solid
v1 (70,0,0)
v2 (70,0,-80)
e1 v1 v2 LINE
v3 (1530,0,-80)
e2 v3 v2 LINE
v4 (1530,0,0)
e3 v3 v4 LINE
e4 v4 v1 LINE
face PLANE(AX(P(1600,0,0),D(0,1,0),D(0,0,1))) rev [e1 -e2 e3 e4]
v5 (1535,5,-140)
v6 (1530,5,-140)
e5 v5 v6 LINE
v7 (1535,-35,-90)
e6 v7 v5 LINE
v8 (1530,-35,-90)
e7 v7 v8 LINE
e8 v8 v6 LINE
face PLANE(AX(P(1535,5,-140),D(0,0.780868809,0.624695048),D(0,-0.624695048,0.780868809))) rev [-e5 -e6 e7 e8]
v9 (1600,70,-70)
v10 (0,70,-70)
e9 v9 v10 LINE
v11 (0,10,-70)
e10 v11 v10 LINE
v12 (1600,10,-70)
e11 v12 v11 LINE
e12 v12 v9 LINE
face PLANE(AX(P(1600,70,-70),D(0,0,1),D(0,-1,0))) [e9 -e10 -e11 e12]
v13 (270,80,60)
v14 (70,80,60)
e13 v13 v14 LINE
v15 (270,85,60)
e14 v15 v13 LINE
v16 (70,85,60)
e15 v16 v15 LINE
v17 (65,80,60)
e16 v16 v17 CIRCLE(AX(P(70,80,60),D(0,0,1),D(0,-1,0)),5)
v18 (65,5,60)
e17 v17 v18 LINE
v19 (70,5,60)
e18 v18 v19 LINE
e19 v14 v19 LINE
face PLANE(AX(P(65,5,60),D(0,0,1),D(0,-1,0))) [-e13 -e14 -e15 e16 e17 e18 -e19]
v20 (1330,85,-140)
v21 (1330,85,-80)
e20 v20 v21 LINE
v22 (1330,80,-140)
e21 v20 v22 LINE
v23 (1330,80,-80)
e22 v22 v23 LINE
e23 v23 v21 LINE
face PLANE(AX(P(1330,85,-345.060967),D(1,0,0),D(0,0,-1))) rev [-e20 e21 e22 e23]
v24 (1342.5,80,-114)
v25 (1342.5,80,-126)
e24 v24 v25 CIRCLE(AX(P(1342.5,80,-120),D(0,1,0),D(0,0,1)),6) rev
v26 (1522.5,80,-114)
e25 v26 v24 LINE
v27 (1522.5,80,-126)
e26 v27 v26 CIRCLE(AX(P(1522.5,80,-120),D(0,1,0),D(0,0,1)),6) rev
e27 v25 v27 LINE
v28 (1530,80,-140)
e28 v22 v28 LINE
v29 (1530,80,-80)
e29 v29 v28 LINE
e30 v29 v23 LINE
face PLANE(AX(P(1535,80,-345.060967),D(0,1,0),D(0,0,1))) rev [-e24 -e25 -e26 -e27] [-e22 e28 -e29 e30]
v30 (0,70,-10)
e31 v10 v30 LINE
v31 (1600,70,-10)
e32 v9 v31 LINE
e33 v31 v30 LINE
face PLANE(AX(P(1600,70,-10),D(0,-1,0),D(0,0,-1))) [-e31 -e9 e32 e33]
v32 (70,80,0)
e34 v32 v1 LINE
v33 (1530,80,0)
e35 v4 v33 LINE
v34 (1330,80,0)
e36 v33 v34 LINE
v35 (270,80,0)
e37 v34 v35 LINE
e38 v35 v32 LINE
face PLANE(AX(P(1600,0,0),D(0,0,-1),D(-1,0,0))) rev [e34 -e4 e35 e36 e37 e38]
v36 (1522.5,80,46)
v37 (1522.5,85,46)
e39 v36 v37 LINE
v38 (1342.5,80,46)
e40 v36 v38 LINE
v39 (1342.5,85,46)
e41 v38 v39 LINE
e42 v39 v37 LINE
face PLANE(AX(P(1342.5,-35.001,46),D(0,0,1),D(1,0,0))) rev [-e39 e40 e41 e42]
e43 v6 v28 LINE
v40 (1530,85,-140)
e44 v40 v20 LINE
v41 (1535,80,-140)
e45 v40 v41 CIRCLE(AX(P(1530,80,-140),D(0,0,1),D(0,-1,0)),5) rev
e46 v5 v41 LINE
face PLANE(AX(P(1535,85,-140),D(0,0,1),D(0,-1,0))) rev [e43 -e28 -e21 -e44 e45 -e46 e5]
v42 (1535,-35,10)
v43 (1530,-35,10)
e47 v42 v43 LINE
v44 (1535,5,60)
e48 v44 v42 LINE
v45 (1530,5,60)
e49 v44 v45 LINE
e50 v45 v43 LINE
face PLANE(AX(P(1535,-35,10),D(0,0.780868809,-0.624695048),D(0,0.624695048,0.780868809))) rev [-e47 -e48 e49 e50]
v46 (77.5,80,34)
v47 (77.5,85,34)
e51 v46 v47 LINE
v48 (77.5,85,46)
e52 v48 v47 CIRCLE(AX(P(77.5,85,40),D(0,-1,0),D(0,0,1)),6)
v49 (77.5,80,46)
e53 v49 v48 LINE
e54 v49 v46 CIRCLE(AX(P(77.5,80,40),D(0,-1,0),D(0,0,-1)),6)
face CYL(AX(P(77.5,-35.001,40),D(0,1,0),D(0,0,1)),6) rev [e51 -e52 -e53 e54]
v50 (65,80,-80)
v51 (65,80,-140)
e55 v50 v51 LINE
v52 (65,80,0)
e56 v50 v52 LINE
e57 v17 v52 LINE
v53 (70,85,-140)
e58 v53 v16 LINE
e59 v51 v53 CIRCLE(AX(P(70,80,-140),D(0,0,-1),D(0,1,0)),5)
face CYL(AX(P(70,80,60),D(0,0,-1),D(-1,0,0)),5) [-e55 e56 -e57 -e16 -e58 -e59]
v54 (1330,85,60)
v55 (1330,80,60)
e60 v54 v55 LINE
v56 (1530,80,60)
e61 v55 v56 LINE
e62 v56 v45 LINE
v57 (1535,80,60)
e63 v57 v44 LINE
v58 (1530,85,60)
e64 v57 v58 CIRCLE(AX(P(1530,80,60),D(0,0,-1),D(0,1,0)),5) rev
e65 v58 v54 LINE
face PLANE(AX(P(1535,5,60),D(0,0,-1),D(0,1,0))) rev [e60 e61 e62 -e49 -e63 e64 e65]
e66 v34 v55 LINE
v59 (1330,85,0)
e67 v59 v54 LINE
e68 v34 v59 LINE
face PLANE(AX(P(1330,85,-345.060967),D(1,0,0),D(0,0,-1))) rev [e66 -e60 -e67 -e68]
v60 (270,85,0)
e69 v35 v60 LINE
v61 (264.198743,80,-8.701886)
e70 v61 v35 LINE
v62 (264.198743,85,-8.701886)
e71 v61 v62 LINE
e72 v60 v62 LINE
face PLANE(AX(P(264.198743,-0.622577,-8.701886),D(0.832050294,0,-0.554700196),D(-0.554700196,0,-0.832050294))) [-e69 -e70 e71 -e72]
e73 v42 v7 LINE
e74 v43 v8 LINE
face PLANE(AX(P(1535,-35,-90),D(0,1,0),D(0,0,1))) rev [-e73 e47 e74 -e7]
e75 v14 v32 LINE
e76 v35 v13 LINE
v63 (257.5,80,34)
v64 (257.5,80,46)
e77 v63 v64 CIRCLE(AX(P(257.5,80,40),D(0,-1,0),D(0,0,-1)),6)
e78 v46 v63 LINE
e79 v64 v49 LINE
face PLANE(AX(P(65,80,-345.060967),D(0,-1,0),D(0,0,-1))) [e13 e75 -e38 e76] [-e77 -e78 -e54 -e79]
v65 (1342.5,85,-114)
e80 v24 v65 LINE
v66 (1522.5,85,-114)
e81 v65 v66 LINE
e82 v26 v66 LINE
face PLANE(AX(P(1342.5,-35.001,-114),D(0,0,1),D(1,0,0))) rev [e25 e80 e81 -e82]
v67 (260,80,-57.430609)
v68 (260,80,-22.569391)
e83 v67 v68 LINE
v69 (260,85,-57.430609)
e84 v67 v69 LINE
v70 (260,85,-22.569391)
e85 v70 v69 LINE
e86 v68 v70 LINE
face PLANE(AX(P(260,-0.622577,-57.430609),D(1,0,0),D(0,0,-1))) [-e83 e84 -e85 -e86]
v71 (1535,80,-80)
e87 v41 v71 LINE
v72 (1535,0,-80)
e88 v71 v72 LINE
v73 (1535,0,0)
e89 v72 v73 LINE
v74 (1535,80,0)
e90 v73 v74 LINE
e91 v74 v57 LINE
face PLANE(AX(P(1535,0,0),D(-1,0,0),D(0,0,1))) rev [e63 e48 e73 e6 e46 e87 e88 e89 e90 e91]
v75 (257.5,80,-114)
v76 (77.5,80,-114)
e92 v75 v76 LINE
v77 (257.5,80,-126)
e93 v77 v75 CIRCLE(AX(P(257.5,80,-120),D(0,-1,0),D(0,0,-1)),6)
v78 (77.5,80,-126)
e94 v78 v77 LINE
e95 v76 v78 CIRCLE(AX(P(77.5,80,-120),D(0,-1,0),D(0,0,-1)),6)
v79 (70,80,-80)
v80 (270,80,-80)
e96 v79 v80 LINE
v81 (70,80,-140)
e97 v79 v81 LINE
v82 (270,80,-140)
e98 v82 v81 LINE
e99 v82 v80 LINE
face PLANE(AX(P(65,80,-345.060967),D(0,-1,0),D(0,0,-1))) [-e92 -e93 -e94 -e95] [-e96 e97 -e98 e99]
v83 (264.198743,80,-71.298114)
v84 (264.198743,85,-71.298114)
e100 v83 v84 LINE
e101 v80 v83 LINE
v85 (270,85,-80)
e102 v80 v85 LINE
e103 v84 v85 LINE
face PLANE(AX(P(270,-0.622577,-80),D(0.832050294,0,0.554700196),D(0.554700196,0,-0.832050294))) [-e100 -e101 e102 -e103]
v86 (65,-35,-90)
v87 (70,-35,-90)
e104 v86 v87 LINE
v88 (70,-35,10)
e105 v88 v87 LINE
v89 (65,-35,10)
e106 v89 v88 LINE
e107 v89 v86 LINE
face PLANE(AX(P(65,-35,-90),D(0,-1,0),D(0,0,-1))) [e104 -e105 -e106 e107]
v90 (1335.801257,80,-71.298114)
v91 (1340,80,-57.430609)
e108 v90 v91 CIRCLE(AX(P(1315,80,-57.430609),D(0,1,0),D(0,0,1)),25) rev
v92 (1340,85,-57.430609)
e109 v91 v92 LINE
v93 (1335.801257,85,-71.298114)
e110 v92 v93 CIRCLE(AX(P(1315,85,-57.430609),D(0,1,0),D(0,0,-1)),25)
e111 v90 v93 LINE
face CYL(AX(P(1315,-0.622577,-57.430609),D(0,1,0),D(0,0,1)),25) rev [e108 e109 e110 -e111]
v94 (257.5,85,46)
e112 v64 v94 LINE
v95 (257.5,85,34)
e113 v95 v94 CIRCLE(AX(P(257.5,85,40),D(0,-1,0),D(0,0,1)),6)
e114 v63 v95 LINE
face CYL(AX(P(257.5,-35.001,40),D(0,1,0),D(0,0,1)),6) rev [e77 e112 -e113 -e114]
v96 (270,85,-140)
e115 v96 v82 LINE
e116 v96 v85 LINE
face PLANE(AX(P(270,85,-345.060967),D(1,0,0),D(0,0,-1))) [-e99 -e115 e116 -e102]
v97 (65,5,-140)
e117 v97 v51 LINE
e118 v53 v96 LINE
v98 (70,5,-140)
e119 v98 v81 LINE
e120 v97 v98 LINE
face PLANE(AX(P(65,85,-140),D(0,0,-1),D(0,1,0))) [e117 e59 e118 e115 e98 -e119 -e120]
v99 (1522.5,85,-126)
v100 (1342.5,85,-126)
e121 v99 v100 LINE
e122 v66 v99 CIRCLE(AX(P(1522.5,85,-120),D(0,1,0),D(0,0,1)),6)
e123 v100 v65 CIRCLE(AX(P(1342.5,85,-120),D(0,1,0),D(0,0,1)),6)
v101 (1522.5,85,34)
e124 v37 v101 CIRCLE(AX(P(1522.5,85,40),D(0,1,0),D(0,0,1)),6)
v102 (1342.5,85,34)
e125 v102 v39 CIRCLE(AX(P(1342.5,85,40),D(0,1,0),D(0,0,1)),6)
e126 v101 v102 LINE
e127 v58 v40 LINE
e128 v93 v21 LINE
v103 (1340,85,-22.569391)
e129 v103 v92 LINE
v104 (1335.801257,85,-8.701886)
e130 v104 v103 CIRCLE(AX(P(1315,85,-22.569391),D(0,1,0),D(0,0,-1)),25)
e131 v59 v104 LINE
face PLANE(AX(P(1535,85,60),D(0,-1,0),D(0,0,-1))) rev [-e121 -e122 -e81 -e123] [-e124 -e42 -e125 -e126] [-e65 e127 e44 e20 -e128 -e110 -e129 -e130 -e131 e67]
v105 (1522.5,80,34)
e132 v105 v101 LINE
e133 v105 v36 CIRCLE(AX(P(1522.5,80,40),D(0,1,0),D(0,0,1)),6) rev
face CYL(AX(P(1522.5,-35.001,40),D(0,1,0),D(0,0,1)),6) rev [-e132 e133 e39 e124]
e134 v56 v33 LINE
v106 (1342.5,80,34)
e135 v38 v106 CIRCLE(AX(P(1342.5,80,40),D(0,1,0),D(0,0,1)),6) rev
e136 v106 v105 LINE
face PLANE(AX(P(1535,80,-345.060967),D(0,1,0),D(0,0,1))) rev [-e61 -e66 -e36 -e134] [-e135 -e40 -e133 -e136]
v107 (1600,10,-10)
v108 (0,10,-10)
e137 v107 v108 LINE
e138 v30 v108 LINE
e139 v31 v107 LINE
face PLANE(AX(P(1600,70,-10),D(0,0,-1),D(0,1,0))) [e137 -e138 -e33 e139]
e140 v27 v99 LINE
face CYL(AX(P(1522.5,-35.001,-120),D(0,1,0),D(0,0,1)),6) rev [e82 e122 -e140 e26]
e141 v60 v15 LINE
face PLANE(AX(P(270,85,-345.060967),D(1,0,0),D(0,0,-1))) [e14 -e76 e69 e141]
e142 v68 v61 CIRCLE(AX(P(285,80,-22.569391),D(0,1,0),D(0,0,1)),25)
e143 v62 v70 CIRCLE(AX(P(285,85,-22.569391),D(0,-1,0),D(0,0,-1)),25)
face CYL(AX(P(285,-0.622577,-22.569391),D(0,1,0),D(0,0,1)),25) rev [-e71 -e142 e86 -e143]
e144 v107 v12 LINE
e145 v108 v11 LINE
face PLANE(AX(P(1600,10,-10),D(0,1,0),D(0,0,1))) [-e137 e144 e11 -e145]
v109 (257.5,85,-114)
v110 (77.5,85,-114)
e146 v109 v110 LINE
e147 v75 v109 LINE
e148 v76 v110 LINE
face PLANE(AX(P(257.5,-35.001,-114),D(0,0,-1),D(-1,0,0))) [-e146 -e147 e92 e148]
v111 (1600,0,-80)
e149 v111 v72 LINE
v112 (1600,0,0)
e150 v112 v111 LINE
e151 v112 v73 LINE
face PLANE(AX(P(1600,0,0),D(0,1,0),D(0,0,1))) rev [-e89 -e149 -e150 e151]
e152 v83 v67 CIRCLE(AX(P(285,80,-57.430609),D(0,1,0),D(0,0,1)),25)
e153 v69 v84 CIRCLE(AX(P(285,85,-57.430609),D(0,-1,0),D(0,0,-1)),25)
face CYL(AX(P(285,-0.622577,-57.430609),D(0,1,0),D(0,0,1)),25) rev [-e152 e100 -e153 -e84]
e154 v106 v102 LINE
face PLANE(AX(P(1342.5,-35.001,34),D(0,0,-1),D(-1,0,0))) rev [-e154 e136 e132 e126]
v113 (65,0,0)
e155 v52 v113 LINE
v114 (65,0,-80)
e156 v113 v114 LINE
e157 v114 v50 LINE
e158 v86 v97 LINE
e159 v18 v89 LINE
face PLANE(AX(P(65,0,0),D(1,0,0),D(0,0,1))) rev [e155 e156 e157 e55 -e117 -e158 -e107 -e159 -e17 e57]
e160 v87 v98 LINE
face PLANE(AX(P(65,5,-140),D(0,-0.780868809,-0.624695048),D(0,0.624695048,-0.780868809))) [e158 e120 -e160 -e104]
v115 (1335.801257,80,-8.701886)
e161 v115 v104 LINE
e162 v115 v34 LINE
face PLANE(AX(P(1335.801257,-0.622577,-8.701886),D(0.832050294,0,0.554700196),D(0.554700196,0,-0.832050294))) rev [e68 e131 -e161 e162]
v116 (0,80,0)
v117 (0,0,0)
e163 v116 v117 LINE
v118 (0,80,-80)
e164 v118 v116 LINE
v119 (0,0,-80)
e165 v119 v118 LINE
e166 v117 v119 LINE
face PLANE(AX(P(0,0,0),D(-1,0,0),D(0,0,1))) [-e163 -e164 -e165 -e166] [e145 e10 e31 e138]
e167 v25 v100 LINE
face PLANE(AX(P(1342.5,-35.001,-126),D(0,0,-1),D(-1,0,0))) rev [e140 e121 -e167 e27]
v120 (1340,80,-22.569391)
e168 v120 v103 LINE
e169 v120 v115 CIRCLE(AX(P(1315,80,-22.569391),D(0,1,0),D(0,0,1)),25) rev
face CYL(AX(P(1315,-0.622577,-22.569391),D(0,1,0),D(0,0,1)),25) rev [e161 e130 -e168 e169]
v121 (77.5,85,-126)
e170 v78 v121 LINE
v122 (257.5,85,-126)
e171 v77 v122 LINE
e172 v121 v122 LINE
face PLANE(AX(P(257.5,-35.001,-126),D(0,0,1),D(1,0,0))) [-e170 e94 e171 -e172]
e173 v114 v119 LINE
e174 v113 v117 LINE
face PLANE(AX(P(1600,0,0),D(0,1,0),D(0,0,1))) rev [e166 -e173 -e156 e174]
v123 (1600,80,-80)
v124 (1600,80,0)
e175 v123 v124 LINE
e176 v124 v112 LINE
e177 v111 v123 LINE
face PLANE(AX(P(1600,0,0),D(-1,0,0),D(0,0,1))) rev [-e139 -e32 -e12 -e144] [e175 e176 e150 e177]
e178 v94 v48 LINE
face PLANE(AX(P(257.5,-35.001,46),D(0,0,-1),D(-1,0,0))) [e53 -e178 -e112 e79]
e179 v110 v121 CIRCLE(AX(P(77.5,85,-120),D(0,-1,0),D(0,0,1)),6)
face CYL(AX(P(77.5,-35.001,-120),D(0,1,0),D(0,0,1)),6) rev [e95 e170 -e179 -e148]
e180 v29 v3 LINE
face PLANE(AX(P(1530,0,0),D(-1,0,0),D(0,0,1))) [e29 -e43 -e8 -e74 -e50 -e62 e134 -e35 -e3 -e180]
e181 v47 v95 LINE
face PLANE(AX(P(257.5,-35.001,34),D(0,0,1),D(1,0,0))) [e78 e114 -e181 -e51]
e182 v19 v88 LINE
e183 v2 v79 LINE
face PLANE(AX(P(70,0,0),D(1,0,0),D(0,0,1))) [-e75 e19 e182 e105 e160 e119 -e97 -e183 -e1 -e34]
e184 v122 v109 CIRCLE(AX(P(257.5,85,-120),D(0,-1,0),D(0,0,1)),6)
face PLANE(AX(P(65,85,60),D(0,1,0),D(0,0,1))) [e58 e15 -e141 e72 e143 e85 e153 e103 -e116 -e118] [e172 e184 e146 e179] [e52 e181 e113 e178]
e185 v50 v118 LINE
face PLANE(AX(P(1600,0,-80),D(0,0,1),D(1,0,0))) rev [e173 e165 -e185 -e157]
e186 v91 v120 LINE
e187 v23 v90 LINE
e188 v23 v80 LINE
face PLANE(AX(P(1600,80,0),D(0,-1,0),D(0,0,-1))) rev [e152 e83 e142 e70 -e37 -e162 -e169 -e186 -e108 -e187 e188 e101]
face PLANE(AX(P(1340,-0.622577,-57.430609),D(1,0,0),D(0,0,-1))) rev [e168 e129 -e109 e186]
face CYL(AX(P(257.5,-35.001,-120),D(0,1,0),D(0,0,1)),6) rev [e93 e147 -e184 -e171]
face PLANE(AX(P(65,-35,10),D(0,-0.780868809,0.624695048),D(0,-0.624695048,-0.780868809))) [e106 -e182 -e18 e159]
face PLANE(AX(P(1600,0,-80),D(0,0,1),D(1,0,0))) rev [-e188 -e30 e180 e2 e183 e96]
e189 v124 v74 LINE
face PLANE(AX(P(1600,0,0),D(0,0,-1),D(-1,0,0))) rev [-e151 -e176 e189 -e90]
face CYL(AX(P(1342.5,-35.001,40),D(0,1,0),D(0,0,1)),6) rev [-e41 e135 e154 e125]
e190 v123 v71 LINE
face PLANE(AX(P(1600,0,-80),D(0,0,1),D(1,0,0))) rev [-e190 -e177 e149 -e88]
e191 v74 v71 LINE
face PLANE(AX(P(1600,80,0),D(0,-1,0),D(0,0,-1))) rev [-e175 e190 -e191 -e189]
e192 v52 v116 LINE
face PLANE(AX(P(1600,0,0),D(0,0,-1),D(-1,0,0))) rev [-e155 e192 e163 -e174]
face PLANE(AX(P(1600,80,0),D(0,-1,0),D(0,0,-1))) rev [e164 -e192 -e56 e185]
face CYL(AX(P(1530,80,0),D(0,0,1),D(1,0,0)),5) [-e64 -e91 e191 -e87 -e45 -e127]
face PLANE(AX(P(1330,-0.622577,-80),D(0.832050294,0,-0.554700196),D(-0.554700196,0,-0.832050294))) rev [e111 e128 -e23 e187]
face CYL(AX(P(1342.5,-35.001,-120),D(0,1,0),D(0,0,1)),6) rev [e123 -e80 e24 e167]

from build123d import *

# Parameters (mm, degrees)
SKETCH3_W                       = 80
SKETCH3_H                       = 80
SKETCH3_W_2                     = 60
SKETCH3_H_2                     = 60
BOSS_EXTRUDE2_DEPTH             = 1600
SKETCH7_W                       = 60
SKETCH7_H                       = 60
BOSS_EXTRUDE3_DEPTH             = 5
BOSS_EXTRUDE4_REACH             = 1610.361
SKETCH8_W                       = 205
SKETCH8_H                       = 5
BOSS_EXTRUDE4_DIRECTION_2_REACH = 1610.361
CUT_EXTRUDE1_DEPTH              = 5
CUT_EXTRUDE2_REACH              = 1612.59
FILLET1_R                       = 5
FILLET1_OF_MIRROR1_R            = 5
FILLET1_OF_MIRROR2_R            = 5


with BuildPart() as part:
    # Sketch3 → Boss-Extrude2 (new body)
    with BuildSketch(Plane(origin=(0, 0, 0), x_dir=(0, 0, -1), z_dir=(1, 0, 0))):
        with Locations((40, 40)):
            Rectangle(SKETCH3_W, SKETCH3_H)
        with Locations((40, 40)):
            Rectangle(SKETCH3_W_2, SKETCH3_H_2, mode=Mode.SUBTRACT)
    extrude(amount=BOSS_EXTRUDE2_DEPTH)

    # Sketch7 → Boss-Extrude3 (add)
    with BuildSketch(Plane(origin=(1530, 0, 0), x_dir=(0, 0, -1), z_dir=(1, 0, 0))):
        Polygon((-60, 85), (140, 85), (140, 5), (90, -35), (-10, -35), (-60, 5), align=None)
        with Locations((40, 40)):
            Rectangle(SKETCH7_W, SKETCH7_H, mode=Mode.SUBTRACT)
    boss_extrude3 = extrude(amount=BOSS_EXTRUDE3_DEPTH)

    # Boss-Extrude4: up to this face of the body (flat: up to its plane)
    boss_extrude4_end = Plane(part.part.faces().sort_by_distance((1532.5, 45, -140))[0])
    # Sketch8 → Boss-Extrude4 (add, up to the picked face)
    with BuildSketch(Plane(origin=(0, 0, -80), x_dir=(-1, 0, 0), z_dir=(0, 0, -1)), mode=Mode.PRIVATE) as boss_extrude4_sk1:
        with Locations((-1432.5, 82.5)):
            Rectangle(SKETCH8_W, SKETCH8_H)
    boss_extrude4_tool1 = split(extrude(boss_extrude4_sk1.sketch, amount=BOSS_EXTRUDE4_REACH, mode=Mode.PRIVATE), bisect_by=boss_extrude4_end, keep=Keep.BOTH, mode=Mode.PRIVATE)
    boss_extrude4 = boss_extrude4_tool1.solids().sort_by(Axis((1432.5, 82.5, -80), (0, 0, -1)))[0]
    add(boss_extrude4)

    # Boss-Extrude4 direction 2: up to this face of the body (flat: up to its plane)
    boss_extrude4_direction_2_end = Plane(part.part.faces().sort_by_distance((1532.5, 45, 60))[0])
    # Sketch8 → Boss-Extrude4 direction 2 (add, up to the picked face)
    with BuildSketch(Plane(origin=(0, 0, -80), x_dir=(-1, 0, 0), z_dir=(0, 0, -1)), mode=Mode.PRIVATE) as boss_extrude4_direction_2_sk1:
        with Locations((-1432.5, 82.5)):
            Rectangle(SKETCH8_W, SKETCH8_H)
    boss_extrude4_direction_2_tool1 = split(extrude(boss_extrude4_direction_2_sk1.sketch, amount=-BOSS_EXTRUDE4_DIRECTION_2_REACH, mode=Mode.PRIVATE), bisect_by=boss_extrude4_direction_2_end, keep=Keep.BOTH, mode=Mode.PRIVATE)
    boss_extrude4_direction_2 = boss_extrude4_direction_2_tool1.solids().sort_by(Axis((1432.5, 82.5, -80), (0, 0, 1)))[0]
    add(boss_extrude4_direction_2)

    # Sketch9 → Cut-Extrude1 (cut)
    with BuildSketch(Plane(origin=(0, 85, 0), x_dir=(1, 0, 0), z_dir=(0, 1, 0))):
        with BuildLine():
            Line((1330, 80), (1335.801257358, 71.298113962))
            ThreePointArc((1335.801257358, 71.298113962), (1338.927300662, 64.675212774), (1340, 57.430609057))
            Line((1340, 57.430609057), (1340, 22.569390943))
            ThreePointArc((1340, 22.569390943), (1338.927300662, 15.324787226), (1335.801257358, 8.701886038))
            Line((1335.801257358, 8.701886038), (1330, 0))
            Line((1330, 0), (1330, 80))
        make_face()
    cut_extrude1 = extrude(amount=-CUT_EXTRUDE1_DEPTH, mode=Mode.SUBTRACT)

    # Sketch10 → Cut-Extrude2 (cut, up to next)
    with BuildSketch(Plane(origin=(0, 85, 0), x_dir=(1, 0, 0), z_dir=(0, 1, 0)), mode=Mode.PRIVATE) as cut_extrude2_sk1:
        with BuildLine():
            Line((1342.5, 126), (1522.5, 126))
            ThreePointArc((1522.5, 126), (1528.5, 120), (1522.5, 114))
            Line((1522.5, 114), (1342.5, 114))
            ThreePointArc((1342.5, 114), (1336.5, 120), (1342.5, 126))
        make_face()
    cut_extrude2_tool1 = extrude(cut_extrude2_sk1.sketch, amount=-CUT_EXTRUDE2_REACH, mode=Mode.PRIVATE) & part.part
    # Sketch10 → Cut-Extrude2 (cut, up to next)
    with BuildSketch(Plane(origin=(0, 85, 0), x_dir=(1, 0, 0), z_dir=(0, 1, 0)), mode=Mode.PRIVATE) as cut_extrude2_sk2:
        with BuildLine():
            Line((1342.5, -34), (1522.5, -34))
            ThreePointArc((1522.5, -34), (1528.5, -40), (1522.5, -46))
            Line((1522.5, -46), (1342.5, -46))
            ThreePointArc((1342.5, -46), (1336.5, -40), (1342.5, -34))
        make_face()
    cut_extrude2_tool2 = extrude(cut_extrude2_sk2.sketch, amount=-CUT_EXTRUDE2_REACH, mode=Mode.PRIVATE) & part.part
    cut_extrude2_1 = cut_extrude2_tool1.solids().sort_by_distance((1432.5, 85, -120))[0]
    add(cut_extrude2_1, mode=Mode.SUBTRACT)
    cut_extrude2_2 = cut_extrude2_tool2.solids().sort_by_distance((1432.5, 85, 40))[0]
    add(cut_extrude2_2, mode=Mode.SUBTRACT)
    cut_extrude2 = cut_extrude2_1 + cut_extrude2_2  # Cut-Extrude2 as one shape, for the pattern or mirror that repeats it

    # Fillet1
    fillet1_edges = [part.edges().sort_by_distance(p)[0] for p in [
        (1535, 85, -40),
    ]]
    fillet(fillet1_edges, radius=FILLET1_R - 0.0001)  # a hair under: the kernel refuses the full size

    # Mirror1: Boss-Extrude3 across plane
    add(boss_extrude3.mirror(Plane(origin=(800, 0, 0), x_dir=(0, 0, 1), z_dir=(1, 0, 0))))

    # Fillet1 of Mirror1
    fillet1_of_mirror1_edges = [part.edges().sort_by_distance(p)[0] for p in [
        (65, 85, -40),
    ]]
    fillet(fillet1_of_mirror1_edges, radius=FILLET1_OF_MIRROR1_R - 0.0001)  # a hair under: the kernel refuses the full size

    # Mirror2: Boss-Extrude3, Boss-Extrude4, Boss-Extrude4 direction 2, Cut-Extrude1, Cut-Extrude2 across plane
    add(boss_extrude3.mirror(Plane(origin=(800, 0, 0), x_dir=(0, 0, 1), z_dir=(1, 0, 0))))
    add(boss_extrude4.mirror(Plane(origin=(800, 0, 0), x_dir=(0, 0, 1), z_dir=(1, 0, 0))))
    add(boss_extrude4_direction_2.mirror(Plane(origin=(800, 0, 0), x_dir=(0, 0, 1), z_dir=(1, 0, 0))))
    add(cut_extrude1.mirror(Plane(origin=(800, 0, 0), x_dir=(0, 0, 1), z_dir=(1, 0, 0))), mode=Mode.SUBTRACT)
    add(cut_extrude2.mirror(Plane(origin=(800, 0, 0), x_dir=(0, 0, 1), z_dir=(1, 0, 0))), mode=Mode.SUBTRACT)

    # Fillet1 of Mirror2
    fillet1_of_mirror2_edges = [part.edges().sort_by_distance(p)[0] for p in [
        (65, 85, -40),
    ]]
    fillet(fillet1_of_mirror2_edges, radius=FILLET1_OF_MIRROR2_R - 0.0001)  # a hair under: the kernel refuses the full size


solid = part.part
